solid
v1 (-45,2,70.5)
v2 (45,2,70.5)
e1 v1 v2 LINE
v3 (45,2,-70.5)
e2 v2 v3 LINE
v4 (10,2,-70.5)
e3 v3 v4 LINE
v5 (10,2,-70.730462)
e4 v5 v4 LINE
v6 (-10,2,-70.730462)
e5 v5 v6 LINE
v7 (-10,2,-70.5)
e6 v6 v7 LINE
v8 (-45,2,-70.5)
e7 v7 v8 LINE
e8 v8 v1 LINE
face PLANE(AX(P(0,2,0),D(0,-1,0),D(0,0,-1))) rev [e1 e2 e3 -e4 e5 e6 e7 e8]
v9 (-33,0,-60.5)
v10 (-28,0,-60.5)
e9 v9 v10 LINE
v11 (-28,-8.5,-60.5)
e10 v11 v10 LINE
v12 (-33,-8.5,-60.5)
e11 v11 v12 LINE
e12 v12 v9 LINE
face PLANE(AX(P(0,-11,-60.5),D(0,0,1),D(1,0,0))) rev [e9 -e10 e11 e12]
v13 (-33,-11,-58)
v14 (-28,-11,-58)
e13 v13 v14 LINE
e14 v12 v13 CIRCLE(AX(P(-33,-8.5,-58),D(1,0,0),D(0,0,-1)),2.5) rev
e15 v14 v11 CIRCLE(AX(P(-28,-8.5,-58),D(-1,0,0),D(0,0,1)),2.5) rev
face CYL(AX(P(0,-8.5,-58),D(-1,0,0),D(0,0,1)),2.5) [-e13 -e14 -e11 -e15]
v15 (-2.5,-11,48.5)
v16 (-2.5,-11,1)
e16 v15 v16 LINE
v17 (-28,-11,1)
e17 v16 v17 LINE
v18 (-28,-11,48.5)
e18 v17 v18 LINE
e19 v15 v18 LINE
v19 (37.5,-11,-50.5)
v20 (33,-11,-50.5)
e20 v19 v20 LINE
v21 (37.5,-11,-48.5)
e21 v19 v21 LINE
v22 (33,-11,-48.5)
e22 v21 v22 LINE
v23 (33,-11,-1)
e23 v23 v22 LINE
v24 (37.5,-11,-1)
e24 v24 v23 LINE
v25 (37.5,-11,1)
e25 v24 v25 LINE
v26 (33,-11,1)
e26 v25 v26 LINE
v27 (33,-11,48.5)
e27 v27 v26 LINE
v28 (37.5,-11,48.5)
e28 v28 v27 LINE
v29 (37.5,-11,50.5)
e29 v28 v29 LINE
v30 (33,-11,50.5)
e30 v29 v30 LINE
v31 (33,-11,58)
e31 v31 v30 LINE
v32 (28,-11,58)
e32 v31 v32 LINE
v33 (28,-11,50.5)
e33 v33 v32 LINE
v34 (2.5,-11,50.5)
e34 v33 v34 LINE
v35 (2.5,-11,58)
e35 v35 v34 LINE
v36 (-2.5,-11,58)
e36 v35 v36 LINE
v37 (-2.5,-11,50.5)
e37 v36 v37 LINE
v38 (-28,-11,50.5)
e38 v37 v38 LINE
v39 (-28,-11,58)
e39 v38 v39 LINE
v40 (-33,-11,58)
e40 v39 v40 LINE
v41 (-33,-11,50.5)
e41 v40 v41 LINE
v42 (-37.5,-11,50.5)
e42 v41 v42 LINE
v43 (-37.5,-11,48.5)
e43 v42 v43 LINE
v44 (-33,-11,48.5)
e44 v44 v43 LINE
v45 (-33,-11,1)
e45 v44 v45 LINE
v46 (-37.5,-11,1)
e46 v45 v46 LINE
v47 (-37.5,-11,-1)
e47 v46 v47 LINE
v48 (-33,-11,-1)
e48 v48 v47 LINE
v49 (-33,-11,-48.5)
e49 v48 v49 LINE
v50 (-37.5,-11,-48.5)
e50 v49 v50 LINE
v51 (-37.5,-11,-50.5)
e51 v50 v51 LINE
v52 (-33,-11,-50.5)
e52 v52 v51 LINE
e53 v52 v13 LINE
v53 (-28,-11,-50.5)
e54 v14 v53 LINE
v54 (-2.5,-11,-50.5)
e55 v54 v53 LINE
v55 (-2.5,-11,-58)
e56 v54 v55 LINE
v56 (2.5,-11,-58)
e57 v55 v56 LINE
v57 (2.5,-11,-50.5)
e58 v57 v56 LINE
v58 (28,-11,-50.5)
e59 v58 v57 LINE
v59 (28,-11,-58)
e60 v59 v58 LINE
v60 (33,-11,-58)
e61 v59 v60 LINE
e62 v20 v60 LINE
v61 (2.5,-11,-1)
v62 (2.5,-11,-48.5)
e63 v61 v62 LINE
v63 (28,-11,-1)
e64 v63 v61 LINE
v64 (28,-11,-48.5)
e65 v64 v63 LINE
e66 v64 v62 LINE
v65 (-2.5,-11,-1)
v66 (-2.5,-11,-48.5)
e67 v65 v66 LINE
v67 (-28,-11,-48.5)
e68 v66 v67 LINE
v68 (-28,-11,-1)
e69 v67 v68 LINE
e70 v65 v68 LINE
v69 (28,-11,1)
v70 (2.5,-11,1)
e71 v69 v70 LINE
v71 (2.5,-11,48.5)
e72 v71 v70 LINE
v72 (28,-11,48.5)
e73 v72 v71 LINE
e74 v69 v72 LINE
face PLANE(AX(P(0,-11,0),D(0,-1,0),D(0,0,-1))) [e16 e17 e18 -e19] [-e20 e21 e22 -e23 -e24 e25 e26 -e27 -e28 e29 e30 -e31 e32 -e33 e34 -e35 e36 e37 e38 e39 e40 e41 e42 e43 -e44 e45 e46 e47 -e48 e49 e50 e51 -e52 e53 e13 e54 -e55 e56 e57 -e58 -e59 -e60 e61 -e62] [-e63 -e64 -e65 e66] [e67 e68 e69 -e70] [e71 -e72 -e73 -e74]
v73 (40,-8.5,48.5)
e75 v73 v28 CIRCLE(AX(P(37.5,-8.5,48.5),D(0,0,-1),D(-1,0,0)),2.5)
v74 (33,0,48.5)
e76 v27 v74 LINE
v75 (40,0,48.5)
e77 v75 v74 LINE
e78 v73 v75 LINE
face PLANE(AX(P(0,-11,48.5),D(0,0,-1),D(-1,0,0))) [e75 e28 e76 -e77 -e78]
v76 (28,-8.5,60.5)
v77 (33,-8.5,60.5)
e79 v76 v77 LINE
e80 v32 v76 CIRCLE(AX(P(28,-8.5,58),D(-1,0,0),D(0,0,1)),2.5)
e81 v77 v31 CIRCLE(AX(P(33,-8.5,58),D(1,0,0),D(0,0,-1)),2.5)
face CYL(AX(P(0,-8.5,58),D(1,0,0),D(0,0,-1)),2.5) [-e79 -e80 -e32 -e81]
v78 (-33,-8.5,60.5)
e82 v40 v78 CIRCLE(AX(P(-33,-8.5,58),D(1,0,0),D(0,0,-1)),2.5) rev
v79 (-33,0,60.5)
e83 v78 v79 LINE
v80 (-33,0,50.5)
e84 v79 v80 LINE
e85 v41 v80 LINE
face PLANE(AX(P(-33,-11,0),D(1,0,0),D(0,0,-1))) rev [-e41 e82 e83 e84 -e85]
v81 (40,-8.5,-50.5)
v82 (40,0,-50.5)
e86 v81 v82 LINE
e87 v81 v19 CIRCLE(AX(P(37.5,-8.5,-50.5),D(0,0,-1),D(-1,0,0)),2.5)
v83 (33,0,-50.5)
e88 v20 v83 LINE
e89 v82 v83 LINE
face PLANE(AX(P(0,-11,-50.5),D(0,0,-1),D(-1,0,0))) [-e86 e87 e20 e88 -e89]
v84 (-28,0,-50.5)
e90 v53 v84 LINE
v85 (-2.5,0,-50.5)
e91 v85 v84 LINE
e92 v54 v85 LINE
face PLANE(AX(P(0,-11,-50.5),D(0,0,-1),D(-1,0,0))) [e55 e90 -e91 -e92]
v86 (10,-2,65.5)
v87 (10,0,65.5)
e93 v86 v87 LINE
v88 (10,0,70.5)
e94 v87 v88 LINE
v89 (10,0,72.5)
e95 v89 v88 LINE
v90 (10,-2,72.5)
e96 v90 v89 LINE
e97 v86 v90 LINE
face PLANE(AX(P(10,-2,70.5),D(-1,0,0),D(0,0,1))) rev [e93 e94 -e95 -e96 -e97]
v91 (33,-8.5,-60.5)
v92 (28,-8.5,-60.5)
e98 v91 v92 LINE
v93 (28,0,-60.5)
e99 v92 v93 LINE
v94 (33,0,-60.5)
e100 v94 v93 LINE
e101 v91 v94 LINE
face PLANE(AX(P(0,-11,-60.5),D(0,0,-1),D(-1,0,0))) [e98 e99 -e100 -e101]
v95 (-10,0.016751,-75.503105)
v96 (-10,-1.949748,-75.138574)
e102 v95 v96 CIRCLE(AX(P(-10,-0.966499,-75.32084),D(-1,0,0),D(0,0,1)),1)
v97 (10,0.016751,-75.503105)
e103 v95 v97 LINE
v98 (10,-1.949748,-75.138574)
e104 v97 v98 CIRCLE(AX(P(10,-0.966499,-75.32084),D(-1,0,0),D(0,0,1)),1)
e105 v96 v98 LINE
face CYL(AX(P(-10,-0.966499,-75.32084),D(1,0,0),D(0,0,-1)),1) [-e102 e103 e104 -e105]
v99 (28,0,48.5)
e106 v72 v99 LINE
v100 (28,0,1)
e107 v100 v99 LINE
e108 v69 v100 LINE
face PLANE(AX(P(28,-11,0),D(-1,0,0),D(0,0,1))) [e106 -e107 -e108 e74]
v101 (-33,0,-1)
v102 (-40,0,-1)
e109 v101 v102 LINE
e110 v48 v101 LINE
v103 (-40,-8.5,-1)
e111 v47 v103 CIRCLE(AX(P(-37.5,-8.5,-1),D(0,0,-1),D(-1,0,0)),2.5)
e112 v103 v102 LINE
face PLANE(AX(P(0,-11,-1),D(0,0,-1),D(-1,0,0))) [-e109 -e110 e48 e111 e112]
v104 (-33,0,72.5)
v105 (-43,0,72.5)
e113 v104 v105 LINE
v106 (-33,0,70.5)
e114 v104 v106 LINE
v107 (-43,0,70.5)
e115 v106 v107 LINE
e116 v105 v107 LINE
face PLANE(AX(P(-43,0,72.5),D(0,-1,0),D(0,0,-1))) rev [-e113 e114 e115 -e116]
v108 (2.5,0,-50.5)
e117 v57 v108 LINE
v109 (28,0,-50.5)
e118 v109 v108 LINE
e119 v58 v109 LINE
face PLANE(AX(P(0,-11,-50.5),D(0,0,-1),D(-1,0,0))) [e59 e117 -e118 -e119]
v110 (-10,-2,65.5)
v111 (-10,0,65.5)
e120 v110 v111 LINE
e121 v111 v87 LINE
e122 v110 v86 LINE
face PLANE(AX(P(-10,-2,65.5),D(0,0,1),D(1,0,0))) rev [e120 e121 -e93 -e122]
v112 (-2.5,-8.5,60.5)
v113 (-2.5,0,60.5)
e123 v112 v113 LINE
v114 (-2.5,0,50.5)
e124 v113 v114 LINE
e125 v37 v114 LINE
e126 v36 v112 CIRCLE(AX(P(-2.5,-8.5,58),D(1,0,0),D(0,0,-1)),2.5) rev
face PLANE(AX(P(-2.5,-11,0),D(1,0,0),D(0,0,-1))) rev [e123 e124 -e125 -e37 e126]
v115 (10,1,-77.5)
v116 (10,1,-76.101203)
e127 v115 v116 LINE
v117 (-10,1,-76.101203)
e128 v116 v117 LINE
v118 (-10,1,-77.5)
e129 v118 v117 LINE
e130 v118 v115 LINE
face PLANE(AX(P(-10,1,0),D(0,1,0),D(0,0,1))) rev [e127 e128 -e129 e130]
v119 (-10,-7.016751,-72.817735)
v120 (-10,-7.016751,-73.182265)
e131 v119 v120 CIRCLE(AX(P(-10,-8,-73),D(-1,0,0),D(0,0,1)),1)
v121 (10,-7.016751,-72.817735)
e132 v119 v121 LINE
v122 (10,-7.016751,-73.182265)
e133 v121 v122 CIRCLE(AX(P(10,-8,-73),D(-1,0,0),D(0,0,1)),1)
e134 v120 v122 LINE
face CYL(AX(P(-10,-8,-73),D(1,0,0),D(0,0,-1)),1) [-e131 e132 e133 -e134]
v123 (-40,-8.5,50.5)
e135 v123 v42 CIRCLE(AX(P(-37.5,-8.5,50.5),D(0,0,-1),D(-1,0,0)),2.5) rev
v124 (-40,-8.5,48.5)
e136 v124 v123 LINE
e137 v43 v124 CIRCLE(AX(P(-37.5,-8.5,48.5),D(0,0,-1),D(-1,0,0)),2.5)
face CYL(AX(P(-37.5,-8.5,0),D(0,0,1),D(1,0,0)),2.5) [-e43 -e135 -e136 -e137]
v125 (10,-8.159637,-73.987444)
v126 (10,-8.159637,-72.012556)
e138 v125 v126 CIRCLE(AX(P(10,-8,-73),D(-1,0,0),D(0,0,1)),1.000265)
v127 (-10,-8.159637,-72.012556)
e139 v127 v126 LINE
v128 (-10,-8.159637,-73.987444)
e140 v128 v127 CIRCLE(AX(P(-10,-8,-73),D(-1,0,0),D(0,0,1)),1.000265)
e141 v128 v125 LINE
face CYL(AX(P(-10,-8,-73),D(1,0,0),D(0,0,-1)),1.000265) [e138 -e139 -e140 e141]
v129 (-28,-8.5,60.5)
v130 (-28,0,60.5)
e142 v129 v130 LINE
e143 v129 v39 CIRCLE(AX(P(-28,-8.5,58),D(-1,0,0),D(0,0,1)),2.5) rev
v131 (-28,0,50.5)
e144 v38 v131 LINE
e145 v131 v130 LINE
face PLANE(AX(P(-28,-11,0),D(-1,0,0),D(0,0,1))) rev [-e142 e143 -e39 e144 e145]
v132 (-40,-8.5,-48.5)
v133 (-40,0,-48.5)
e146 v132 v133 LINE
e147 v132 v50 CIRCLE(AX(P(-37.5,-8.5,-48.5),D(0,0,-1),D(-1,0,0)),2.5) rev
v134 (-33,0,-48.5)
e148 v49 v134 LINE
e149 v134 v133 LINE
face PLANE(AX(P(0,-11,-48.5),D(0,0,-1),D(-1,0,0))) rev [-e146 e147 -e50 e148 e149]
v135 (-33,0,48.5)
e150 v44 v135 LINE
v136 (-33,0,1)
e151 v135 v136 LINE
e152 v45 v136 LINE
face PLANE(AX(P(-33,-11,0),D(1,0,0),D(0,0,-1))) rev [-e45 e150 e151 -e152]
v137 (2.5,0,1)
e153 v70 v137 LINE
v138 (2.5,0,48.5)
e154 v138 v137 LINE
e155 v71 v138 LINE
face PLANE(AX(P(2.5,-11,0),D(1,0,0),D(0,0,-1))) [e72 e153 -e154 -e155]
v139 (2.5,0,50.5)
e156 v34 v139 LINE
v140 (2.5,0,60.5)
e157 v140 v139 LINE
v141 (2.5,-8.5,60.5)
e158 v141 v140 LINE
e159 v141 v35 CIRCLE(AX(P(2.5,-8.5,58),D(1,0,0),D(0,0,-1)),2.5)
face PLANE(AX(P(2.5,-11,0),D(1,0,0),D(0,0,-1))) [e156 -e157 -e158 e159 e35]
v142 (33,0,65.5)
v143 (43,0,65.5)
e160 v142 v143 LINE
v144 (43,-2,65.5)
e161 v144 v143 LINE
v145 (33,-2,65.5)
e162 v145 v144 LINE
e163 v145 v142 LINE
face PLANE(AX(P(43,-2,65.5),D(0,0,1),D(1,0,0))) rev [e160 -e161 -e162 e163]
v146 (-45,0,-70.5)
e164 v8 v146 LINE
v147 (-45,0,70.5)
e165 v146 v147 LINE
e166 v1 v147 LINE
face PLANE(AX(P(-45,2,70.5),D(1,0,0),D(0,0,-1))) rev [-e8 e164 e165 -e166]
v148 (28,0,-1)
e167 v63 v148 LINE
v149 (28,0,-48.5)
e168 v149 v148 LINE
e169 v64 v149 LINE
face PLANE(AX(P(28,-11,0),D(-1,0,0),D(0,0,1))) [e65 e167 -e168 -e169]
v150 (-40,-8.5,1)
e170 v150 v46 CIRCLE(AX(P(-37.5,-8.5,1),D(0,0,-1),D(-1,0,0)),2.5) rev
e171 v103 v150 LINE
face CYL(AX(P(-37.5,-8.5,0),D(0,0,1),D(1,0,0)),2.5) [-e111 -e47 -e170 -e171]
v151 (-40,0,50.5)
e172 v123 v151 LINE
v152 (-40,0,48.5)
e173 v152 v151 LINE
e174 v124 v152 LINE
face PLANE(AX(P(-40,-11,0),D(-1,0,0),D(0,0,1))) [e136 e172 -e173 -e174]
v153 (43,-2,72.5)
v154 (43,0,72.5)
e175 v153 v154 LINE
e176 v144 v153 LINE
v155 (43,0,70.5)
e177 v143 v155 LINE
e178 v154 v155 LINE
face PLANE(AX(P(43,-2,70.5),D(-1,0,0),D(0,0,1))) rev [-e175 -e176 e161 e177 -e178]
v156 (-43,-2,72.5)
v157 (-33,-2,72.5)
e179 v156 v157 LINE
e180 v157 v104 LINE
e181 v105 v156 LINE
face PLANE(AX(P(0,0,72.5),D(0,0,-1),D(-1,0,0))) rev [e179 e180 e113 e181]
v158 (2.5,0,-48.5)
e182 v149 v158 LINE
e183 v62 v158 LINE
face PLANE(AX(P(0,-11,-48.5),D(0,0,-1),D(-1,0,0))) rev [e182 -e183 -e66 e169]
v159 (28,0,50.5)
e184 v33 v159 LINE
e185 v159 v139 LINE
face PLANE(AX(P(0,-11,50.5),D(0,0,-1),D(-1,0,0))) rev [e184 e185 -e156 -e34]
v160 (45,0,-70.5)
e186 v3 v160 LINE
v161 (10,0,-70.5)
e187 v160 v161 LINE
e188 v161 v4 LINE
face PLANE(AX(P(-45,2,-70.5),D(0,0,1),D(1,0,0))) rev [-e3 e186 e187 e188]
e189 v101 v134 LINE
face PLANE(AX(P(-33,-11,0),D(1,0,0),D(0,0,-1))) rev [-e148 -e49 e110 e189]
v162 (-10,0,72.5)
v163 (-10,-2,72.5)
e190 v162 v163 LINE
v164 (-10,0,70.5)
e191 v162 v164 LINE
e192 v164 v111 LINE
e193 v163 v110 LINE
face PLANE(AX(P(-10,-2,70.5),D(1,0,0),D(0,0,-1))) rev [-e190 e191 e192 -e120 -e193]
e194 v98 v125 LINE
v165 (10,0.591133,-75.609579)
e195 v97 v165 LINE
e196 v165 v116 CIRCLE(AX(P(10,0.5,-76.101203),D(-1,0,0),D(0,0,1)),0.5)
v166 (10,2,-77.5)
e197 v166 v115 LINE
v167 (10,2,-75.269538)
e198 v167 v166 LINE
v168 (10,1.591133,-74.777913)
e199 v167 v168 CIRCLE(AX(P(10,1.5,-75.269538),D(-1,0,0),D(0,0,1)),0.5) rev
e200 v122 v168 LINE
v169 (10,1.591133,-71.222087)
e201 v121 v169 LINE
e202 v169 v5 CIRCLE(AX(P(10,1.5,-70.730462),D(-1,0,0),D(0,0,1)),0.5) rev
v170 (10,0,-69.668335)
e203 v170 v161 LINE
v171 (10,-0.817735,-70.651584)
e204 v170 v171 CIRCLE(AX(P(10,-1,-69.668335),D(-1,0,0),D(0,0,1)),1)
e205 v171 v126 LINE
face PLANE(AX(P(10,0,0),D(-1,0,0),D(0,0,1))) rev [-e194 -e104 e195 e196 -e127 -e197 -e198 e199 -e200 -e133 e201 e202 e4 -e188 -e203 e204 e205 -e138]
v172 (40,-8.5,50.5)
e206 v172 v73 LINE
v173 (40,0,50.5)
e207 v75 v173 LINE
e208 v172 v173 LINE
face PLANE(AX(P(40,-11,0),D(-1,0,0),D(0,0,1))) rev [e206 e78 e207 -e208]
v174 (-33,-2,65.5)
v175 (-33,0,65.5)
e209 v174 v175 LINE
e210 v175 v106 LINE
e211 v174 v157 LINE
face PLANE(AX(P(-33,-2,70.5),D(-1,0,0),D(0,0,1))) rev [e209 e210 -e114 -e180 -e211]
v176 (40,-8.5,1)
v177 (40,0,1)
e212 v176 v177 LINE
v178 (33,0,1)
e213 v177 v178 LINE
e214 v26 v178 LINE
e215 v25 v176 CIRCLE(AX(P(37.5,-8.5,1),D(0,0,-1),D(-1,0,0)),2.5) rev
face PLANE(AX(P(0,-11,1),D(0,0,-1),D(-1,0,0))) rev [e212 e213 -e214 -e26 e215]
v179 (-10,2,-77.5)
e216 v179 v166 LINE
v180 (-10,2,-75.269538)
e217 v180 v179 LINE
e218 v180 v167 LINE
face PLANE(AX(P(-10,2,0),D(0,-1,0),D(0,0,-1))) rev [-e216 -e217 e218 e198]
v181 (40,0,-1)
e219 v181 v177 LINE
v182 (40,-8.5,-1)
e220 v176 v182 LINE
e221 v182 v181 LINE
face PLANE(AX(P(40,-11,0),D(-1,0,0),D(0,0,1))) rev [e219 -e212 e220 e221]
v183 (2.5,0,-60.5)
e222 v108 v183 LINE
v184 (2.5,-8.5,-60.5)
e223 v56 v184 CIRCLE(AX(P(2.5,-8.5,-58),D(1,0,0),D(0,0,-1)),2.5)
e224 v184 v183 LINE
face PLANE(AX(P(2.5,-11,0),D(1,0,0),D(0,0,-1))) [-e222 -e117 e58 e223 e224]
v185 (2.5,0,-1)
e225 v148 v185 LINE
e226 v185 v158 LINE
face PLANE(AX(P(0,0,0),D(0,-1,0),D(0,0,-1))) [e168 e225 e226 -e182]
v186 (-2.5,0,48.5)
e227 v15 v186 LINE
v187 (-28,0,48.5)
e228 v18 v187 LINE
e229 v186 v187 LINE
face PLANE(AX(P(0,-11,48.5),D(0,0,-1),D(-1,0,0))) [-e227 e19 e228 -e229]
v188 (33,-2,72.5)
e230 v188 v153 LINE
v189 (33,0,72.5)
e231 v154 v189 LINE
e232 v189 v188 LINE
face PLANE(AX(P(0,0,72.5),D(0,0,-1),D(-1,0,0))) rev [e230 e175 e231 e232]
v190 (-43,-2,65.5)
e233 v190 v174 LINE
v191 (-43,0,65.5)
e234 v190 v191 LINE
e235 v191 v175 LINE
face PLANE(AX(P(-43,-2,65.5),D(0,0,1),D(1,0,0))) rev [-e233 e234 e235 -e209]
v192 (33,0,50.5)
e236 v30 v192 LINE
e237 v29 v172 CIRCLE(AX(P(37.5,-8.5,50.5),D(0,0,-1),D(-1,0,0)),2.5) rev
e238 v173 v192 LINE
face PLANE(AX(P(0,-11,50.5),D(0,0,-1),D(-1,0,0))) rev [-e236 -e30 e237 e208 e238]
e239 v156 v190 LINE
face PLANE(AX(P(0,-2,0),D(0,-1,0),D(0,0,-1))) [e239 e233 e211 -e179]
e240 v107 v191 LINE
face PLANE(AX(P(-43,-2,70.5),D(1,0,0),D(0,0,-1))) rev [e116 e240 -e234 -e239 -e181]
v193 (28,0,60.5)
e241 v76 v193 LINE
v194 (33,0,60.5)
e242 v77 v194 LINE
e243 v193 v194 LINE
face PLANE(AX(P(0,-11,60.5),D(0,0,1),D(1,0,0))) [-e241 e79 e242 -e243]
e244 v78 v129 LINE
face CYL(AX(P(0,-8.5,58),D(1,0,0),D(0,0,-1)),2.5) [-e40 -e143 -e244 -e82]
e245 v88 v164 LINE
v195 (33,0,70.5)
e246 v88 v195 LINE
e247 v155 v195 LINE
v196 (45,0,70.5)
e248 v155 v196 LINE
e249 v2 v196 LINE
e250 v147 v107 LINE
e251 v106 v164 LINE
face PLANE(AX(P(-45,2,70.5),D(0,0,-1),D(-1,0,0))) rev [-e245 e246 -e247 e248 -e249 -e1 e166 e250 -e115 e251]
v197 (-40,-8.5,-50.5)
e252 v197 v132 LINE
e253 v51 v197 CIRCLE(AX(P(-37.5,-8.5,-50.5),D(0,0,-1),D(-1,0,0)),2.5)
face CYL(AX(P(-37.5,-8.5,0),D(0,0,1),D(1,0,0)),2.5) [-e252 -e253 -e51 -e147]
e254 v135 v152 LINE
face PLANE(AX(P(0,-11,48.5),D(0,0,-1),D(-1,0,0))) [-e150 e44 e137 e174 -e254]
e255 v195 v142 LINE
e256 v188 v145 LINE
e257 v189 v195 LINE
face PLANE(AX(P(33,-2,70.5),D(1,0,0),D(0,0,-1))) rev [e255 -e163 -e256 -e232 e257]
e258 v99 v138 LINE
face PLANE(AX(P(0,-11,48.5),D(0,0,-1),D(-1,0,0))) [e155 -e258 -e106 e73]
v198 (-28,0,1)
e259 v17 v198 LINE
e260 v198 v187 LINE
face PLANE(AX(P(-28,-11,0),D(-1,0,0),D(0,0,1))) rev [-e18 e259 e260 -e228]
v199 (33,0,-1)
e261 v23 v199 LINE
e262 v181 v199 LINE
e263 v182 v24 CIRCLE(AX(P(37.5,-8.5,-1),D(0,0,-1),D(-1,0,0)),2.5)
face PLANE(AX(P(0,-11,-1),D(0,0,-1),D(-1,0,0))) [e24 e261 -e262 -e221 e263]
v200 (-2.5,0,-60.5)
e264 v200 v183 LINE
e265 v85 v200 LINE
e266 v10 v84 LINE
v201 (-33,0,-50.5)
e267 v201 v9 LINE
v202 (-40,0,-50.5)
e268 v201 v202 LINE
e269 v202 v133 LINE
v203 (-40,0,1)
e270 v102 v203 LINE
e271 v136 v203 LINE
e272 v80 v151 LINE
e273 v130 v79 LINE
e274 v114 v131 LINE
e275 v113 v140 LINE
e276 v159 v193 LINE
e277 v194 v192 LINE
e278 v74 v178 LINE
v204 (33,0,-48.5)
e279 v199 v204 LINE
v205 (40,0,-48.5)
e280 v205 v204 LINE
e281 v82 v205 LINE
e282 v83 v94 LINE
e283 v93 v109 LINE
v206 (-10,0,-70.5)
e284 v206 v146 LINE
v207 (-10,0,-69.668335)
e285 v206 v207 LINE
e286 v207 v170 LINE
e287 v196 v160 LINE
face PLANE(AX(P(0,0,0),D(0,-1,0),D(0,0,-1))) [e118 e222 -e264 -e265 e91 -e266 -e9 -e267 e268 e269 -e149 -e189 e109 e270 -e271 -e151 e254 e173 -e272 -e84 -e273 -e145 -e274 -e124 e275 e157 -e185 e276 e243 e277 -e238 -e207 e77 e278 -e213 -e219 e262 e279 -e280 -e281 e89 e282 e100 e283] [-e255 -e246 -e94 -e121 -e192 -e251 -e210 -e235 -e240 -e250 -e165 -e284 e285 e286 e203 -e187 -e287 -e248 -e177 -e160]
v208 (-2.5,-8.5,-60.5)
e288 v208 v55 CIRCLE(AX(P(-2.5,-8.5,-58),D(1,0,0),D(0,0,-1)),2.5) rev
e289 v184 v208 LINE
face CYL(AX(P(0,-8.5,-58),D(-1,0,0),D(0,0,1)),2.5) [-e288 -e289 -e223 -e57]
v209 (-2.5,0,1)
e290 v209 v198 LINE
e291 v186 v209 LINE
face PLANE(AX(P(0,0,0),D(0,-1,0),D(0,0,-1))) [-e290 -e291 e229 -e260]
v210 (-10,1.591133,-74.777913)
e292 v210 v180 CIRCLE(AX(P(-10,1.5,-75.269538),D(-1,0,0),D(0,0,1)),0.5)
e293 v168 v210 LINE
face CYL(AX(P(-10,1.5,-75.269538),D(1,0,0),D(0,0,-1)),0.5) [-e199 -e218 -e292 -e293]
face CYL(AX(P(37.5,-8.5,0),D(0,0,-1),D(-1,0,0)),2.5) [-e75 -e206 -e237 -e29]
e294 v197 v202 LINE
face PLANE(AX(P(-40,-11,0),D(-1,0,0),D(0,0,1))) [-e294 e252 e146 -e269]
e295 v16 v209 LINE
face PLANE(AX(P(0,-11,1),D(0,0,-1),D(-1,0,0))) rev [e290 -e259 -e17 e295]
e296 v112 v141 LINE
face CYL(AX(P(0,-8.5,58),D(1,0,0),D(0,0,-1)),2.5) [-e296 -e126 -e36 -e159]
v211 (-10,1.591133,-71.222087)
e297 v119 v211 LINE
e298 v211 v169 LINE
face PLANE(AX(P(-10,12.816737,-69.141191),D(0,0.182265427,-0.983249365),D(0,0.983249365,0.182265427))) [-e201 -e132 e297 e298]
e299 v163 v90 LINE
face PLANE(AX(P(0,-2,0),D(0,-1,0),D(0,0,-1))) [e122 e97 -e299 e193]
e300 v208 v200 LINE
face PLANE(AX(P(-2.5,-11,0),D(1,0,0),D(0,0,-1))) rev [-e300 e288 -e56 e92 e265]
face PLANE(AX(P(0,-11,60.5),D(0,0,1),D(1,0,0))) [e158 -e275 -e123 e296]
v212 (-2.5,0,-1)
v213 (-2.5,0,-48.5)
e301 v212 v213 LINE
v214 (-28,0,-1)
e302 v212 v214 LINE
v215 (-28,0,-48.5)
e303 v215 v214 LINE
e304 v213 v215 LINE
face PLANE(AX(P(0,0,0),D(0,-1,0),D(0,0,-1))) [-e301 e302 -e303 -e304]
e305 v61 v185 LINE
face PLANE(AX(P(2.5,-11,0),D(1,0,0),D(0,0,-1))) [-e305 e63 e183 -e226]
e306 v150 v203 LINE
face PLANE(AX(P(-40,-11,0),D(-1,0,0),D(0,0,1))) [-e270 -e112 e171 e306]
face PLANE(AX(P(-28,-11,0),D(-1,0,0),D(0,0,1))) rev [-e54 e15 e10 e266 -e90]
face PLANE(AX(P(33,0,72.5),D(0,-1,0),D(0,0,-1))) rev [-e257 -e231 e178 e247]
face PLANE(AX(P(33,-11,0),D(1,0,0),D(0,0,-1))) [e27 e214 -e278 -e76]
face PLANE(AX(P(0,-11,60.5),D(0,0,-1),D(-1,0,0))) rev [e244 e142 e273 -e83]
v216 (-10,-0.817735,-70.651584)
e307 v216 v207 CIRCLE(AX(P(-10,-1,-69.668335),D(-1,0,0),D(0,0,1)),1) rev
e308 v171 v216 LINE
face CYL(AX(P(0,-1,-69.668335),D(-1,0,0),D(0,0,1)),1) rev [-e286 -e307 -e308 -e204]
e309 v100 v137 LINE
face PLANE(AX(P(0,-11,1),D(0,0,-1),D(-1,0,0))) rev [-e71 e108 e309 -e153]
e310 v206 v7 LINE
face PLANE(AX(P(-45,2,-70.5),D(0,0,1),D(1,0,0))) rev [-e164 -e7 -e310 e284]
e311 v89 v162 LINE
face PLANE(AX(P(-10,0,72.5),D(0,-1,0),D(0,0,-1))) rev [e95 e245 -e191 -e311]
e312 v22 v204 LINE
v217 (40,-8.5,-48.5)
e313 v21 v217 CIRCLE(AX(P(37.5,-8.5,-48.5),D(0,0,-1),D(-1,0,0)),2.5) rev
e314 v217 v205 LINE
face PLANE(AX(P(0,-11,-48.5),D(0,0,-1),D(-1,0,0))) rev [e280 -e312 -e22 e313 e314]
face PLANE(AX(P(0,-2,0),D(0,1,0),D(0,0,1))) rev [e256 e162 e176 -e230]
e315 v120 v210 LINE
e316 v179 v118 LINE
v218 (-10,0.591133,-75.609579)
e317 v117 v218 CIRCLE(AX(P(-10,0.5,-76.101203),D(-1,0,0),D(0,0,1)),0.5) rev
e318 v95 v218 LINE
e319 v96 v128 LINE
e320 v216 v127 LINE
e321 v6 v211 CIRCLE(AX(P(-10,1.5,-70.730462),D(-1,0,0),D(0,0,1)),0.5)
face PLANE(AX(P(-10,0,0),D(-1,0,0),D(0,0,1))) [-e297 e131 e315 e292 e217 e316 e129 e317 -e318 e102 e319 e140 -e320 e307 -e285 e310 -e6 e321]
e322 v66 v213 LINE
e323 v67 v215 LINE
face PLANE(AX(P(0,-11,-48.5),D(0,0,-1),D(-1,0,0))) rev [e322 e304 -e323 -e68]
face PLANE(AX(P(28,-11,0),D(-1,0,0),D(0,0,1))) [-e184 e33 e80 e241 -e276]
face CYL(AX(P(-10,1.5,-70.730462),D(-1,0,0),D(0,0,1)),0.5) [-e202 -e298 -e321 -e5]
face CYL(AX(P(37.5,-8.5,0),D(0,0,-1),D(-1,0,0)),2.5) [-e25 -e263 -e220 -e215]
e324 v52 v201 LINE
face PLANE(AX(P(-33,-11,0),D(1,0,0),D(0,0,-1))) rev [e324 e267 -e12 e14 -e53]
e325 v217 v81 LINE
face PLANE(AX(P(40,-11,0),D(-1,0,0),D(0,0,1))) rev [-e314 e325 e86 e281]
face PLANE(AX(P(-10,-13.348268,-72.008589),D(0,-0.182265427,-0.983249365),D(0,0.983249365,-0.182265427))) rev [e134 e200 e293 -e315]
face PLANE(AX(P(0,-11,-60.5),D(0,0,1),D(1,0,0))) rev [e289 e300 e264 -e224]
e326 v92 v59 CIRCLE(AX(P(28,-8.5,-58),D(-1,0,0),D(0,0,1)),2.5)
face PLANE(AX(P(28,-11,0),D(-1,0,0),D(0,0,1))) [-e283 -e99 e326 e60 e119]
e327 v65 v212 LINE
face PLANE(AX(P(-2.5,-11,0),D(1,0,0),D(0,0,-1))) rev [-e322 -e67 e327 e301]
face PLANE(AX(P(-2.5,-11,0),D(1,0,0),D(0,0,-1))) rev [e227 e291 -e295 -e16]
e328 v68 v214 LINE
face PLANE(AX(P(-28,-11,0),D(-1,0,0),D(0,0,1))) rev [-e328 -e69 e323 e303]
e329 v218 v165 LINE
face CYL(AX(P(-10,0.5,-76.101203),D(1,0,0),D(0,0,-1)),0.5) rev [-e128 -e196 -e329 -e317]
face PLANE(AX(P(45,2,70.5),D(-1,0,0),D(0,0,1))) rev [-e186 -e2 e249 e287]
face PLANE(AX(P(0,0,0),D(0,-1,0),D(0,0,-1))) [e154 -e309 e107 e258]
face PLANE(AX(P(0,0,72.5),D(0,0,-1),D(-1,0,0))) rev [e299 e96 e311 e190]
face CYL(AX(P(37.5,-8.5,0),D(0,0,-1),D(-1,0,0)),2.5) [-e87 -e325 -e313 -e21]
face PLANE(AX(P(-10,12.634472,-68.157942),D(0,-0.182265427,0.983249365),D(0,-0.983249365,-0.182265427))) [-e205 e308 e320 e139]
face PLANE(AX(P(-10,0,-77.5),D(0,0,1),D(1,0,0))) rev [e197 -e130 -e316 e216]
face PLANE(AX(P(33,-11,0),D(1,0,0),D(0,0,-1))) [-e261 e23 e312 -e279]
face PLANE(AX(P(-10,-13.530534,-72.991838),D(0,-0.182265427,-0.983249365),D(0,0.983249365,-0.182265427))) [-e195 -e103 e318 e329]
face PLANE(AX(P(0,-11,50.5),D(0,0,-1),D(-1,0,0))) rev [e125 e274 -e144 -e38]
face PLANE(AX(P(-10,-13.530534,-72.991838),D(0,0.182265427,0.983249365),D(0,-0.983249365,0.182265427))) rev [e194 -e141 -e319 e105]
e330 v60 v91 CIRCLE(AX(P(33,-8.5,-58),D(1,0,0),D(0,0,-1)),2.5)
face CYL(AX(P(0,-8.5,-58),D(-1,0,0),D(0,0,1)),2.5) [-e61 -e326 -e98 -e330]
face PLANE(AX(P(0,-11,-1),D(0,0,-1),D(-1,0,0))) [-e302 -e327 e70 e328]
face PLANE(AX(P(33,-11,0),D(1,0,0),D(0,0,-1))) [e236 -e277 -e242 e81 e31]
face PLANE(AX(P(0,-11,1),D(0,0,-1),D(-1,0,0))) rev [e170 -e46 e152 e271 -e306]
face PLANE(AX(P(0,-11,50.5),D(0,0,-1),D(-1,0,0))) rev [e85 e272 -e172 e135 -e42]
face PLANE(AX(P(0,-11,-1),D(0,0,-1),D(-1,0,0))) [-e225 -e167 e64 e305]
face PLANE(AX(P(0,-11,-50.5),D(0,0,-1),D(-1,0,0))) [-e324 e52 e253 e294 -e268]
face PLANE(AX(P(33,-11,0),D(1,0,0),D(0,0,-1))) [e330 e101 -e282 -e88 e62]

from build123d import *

# Parameters (mm, degrees)
SKETCH1_W           = 90
SKETCH1_H           = 141
BOSS_EXTRUDE1_DEPTH = 2
SKETCH2_W           = 20
SKETCH2_H           = 5
SKETCH2_W_2         = 10
BOSS_EXTRUDE2_DEPTH = 2
SKETCH3_W           = 10
SKETCH3_H           = 2
SKETCH3_W_2         = 20
BOSS_EXTRUDE3_DEPTH = 2
BOSS_EXTRUDE4_DEPTH = 10
FILLET1_R           = 1
FILLET2_R           = 0.5
FILLET3_R           = 0.5
SKETCH5_W           = 25.5
SKETCH5_H           = 47.5
BOSS_EXTRUDE5_DEPTH = 11
FILLET4_R           = 2.5


with BuildPart() as part:
    # Sketch1 → Boss-Extrude1 (new body)
    with BuildSketch(Plane(origin=(0, 0, 0), x_dir=(1, 0, 0), z_dir=(0, 1, 0))):
        Rectangle(SKETCH1_W, SKETCH1_H)
    extrude(amount=BOSS_EXTRUDE1_DEPTH)

    # Sketch2 → Boss-Extrude2 (add)
    with BuildSketch(Plane.XZ):
        with Locations((0, 68)):
            Rectangle(SKETCH2_W, SKETCH2_H)
        with Locations((-38, 68)):
            Rectangle(SKETCH2_W_2, SKETCH2_H)
        with Locations((38, 68)):
            Rectangle(SKETCH2_W_2, SKETCH2_H)
    extrude(amount=BOSS_EXTRUDE2_DEPTH)

    # Sketch3 → Boss-Extrude3 (add)
    with BuildSketch(Plane.XY.offset(70.5)):
        with Locations((-38, -1)):
            Rectangle(SKETCH3_W, SKETCH3_H)
        with Locations((0, -1)):
            Rectangle(SKETCH3_W_2, SKETCH3_H)
        with Locations((38, -1)):
            Rectangle(SKETCH3_W, SKETCH3_H)
    extrude(amount=BOSS_EXTRUDE3_DEPTH)

    # Sketch4 → Boss-Extrude4 (add, symmetric)
    with BuildSketch(Plane.ZY):
        with BuildLine():
            Line((-72.817686313, -7.01649029), (-72.817734573, -7.016750635))
            ThreePointArc((-72.817734573, -7.016750635), (-73, -7), (-73.182265427, -7.016750635))
            Line((-73.182265427, -7.016750635), (-73.182313687, -7.01649029))
            Line((-73.182313687, -7.01649029), (-74.853705002, 2))
            Line((-74.853705002, 2), (-75.5, 2))
            Line((-75.5, 2), (-77.5, 2))
            Line((-77.5, 2), (-77.5, 1))
            Line((-77.5, 1), (-75.6853705, 1))
            Line((-75.6853705, 1), (-75.503105074, 0.016750635))
            ThreePointArc((-75.503105074, 0.016750635), (-76.304089012, -1.148764157), (-75.13857422, -1.949748096))
            Line((-75.13857422, -1.949748096), (-73.987443964, -8.159637236))
            ThreePointArc((-73.987443964, -8.159637236), (-73, -9.00026478), (-72.012556036, -8.159637236))
            Line((-72.012556036, -8.159637236), (-70.5, 0))
            Line((-70.5, 0), (-70.5, 2))
            Line((-70.5, 2), (-71.146294998, 2))
            Line((-71.146294998, 2), (-72.817686313, -7.01649029))
        make_face()
    extrude(amount=BOSS_EXTRUDE4_DEPTH, both=True)

    # Fillet1
    fillet1_edges = [part.edges().sort_by_distance(p)[0] for p in [
        (0, 0, -70.5),
    ]]
    fillet(fillet1_edges, radius=FILLET1_R)

    # Fillet2
    fillet2_edges = [part.edges().sort_by_distance(p)[0] for p in [
        (0, 2, -74.853705002),
        (0, 2, -71.146294998),
    ]]
    fillet(fillet2_edges, radius=FILLET2_R)

    # Fillet3
    fillet3_edges = [part.edges().sort_by_distance(p)[0] for p in [
        (0, 1, -75.6853705),
    ]]
    fillet(fillet3_edges, radius=FILLET3_R)

    # Sketch5 → Boss-Extrude5 (add)
    with BuildSketch(Plane.XZ):
        Polygon((33, 50.5), (33, 60.5), (28, 60.5), (28, 50.5), (2.5, 50.5), (2.5, 60.5), (-2.5, 60.5), (-2.5, 50.5), (-28, 50.5), (-28, 60.5), (-33, 60.5), (-33, 50.5), (-40, 50.5), (-40, 48.5), (-33, 48.5), (-33, 1), (-40, 1), (-40, -1), (-33, -1), (-33, -48.5), (-40, -48.5), (-40, -50.5), (-33, -50.5), (-33, -60.5), (-28, -60.5), (-28, -50.5), (-2.5, -50.5), (-2.5, -60.5), (2.5, -60.5), (2.5, -50.5), (28, -50.5), (28, -60.5), (33, -60.5), (33, -50.5), (40, -50.5), (40, -48.5), (33, -48.5), (33, -1), (40, -1), (40, 1), (33, 1), (33, 48.5), (40, 48.5), (40, 50.5), align=None)
        with Locations((-15.25, -24.75)):
            Rectangle(SKETCH5_W, SKETCH5_H, mode=Mode.SUBTRACT)
        with Locations((15.25, -24.75)):
            Rectangle(SKETCH5_W, SKETCH5_H, mode=Mode.SUBTRACT)
        with Locations((-15.25, 24.75)):
            Rectangle(SKETCH5_W, SKETCH5_H, mode=Mode.SUBTRACT)
        with Locations((15.25, 24.75)):
            Rectangle(SKETCH5_W, SKETCH5_H, mode=Mode.SUBTRACT)
    extrude(amount=BOSS_EXTRUDE5_DEPTH)

    # Fillet4
    fillet4_edges = [part.edges().sort_by_distance(p)[0] for p in [
        (-40, -11, 49.5),
        (40, -11, 49.5),
        (40, -11, 0),
        (-40, -11, 0),
        (-40, -11, -49.5),
        (40, -11, -49.5),
        (-30.5, -11, 60.5),
        (0, -11, 60.5),
        (30.5, -11, 60.5),
        (0, -11, -60.5),
        (-30.5, -11, -60.5),
        (30.5, -11, -60.5),
    ]]
    fillet(fillet4_edges, radius=FILLET4_R)


solid = part.part
